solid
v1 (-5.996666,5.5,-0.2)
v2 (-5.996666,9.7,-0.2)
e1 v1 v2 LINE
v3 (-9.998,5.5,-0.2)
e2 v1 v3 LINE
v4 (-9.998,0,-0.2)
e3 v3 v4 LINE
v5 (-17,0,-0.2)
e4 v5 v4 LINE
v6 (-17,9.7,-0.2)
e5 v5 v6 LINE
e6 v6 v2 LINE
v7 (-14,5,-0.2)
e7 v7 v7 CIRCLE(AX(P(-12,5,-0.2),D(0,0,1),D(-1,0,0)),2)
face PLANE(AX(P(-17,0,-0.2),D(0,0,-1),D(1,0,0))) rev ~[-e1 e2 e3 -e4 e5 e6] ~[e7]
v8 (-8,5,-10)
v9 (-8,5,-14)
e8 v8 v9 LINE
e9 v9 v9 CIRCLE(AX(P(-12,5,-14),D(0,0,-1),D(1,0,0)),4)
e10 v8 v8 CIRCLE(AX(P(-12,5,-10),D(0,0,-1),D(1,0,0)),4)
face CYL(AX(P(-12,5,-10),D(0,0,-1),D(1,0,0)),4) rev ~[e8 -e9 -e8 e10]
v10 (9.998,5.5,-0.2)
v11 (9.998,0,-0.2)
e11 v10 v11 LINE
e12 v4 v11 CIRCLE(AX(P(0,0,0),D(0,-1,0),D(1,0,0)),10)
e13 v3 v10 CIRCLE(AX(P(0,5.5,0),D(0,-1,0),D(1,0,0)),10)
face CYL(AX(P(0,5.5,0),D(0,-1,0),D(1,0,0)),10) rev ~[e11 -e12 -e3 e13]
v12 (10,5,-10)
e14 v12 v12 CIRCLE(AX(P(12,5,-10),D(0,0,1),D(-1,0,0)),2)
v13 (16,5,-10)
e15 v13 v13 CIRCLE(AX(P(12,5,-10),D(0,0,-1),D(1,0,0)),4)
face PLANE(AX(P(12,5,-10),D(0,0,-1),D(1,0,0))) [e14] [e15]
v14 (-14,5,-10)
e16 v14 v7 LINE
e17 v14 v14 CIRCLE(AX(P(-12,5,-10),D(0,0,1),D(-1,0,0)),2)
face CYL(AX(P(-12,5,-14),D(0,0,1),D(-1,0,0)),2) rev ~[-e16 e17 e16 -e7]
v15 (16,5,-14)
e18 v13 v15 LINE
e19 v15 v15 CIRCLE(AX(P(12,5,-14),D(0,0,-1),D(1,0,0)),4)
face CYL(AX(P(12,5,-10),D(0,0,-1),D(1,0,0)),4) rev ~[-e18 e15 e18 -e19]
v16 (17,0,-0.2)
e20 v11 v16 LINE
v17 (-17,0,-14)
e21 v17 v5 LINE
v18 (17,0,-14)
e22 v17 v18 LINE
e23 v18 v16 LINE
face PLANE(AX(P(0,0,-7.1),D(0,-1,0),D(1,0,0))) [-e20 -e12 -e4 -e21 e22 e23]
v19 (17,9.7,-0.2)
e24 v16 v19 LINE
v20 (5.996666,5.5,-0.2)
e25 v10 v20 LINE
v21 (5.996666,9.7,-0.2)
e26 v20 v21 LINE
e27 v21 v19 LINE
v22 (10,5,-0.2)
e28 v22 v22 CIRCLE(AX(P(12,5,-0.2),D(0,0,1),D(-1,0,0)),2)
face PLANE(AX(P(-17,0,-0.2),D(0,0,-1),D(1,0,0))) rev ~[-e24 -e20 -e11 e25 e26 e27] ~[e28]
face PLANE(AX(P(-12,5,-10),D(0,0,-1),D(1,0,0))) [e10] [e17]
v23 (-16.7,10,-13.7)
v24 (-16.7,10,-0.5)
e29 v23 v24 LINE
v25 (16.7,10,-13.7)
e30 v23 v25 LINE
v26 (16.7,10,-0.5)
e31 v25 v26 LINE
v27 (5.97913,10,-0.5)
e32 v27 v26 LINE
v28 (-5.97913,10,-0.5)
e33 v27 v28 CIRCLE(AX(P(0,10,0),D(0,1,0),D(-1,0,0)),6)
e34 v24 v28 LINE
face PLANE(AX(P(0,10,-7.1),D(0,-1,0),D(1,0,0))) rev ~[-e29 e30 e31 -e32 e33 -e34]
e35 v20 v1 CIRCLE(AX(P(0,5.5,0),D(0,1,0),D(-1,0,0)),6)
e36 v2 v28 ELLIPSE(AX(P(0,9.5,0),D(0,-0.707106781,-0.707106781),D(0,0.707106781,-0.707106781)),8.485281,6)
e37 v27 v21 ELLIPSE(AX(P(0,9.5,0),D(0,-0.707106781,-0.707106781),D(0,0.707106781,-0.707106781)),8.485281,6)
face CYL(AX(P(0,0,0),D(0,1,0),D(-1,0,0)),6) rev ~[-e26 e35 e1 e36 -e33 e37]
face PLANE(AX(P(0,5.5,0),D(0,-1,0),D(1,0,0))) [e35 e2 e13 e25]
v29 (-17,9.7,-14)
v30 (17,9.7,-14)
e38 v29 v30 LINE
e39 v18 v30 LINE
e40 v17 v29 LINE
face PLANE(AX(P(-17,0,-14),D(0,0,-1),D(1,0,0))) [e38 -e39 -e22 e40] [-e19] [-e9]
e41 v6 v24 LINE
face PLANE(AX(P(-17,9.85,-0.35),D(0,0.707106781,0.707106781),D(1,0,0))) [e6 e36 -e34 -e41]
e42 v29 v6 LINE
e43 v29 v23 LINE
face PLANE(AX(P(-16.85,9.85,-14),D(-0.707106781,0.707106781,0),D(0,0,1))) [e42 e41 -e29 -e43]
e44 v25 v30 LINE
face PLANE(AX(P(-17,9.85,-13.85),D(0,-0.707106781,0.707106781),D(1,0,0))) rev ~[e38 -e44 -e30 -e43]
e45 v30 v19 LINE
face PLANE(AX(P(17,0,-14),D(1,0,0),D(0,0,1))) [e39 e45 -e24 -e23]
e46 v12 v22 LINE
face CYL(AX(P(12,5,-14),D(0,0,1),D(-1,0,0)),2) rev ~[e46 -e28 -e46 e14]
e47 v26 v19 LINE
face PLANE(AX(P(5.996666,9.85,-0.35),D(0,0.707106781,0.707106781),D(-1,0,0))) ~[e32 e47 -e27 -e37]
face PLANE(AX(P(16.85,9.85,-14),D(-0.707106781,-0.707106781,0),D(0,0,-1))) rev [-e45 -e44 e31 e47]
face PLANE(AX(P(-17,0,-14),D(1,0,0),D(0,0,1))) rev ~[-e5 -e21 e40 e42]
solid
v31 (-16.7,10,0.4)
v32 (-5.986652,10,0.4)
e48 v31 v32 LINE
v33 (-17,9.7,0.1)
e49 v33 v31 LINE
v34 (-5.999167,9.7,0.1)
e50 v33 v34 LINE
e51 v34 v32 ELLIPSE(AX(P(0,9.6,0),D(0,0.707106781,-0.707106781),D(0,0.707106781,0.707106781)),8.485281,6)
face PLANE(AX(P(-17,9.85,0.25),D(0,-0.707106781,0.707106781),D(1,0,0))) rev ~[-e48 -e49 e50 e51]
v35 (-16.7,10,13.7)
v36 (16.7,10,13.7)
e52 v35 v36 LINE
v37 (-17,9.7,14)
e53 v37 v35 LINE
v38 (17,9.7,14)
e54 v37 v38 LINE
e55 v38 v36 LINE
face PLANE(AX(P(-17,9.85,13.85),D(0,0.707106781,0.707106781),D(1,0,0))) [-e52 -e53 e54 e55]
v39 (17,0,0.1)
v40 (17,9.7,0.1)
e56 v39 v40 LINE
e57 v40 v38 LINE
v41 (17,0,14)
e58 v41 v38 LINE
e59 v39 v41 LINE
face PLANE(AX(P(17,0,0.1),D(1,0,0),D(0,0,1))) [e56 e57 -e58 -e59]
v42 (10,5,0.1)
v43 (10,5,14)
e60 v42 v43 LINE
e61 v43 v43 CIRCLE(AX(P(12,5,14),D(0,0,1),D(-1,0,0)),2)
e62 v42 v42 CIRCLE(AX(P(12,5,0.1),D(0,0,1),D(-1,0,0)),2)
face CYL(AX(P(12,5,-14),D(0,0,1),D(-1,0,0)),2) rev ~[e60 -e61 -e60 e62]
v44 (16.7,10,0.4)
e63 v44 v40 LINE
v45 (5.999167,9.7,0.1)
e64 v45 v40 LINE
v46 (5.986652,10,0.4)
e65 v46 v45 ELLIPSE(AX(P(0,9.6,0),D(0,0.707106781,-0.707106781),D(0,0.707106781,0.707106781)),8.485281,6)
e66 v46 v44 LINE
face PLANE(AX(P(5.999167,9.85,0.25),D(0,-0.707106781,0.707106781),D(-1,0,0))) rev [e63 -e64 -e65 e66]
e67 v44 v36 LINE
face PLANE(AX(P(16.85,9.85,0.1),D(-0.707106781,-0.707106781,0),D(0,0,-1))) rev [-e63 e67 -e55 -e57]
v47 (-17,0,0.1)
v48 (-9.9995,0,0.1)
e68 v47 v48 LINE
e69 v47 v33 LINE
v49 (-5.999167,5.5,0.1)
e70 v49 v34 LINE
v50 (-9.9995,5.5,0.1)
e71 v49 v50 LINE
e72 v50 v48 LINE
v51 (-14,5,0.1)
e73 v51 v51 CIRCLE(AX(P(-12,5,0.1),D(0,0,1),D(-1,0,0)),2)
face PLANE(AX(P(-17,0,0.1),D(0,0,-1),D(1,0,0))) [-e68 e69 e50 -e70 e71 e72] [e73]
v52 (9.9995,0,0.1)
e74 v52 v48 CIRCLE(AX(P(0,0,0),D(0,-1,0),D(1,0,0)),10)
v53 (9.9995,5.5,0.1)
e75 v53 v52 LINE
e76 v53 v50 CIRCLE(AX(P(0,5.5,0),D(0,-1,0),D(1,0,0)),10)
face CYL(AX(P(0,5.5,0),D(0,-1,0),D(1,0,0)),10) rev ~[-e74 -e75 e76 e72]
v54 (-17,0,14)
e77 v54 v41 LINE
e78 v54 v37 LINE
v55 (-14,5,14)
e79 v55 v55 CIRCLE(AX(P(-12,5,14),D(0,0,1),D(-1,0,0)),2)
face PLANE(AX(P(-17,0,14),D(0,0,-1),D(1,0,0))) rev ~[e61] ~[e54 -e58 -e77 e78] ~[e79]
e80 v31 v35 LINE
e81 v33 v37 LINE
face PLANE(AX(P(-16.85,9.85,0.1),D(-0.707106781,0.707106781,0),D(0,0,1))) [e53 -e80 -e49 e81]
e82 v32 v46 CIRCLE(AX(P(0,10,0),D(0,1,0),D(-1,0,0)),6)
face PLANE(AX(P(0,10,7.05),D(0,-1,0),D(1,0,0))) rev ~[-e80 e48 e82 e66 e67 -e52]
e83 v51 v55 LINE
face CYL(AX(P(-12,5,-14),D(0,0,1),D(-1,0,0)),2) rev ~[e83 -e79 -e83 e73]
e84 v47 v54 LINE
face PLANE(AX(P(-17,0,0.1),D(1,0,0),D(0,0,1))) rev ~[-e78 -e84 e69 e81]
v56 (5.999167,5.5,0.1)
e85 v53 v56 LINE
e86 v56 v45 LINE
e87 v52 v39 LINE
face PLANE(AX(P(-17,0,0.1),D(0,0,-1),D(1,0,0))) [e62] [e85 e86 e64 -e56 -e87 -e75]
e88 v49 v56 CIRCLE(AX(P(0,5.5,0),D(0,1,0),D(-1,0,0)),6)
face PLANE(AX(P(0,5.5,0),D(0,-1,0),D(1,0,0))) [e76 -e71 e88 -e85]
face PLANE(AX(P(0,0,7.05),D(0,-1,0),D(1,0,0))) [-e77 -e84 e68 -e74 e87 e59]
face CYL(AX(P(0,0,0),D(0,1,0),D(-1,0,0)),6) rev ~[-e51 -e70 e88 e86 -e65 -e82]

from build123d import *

# Parameters (mm, degrees)
F0_W             = 34
F0_H             = 13.9
F1_DEPTH         = 10
F0_H_2           = 13.8
F2_D             = 12
F2_CBORE_D       = 20
F2_CBORE_DEPTH   = 5.5
F2_2_D           = 12
F2_2_CBORE_D     = 20
F2_2_CBORE_DEPTH = 5.5
F4_D             = 4
F4_CBORE_D       = 8
F4_CBORE_DEPTH   = 4
F4_2_D           = 4
F4_2_CBORE_D     = 8
F4_2_CBORE_DEPTH = 4
F5_SIZE          = 0.3
F5_2_SIZE        = 0.3


# Not quite as in the source:
# - a feature names something its author has since deleted; it is built from what else it names


with BuildPart() as f1:
    # F0 (on Front) → F1 (new body)
    with BuildSketch(Plane.XZ):
        with Locations((0, 7.05)):
            Rectangle(F0_W, F0_H)
    extrude(amount=-F1_DEPTH)

    # F2 (through all)
    with Locations(Plane.XZ):
        with Locations((0, 0)):
            CounterBoreHole(F2_D / 2, F2_CBORE_D / 2, F2_CBORE_DEPTH)

    # F4 (through all)
    with Locations(Plane(origin=(0, 0, -14), x_dir=(1, 0, 0), z_dir=(0, 0, -1))):
        with Locations((-12, -5), (12, -5)):
            CounterBoreHole(F4_D / 2, F4_CBORE_D / 2, F4_CBORE_DEPTH)

    # F5
    f5_edges = [f1.edges().sort_by_distance(p)[0] for p in [
        (0, 10, 14),
        (-17, 10, 7.05),
        (17, 10, 7.05),
        (11.499583, 10, 0.1),
        (-11.499583, 10, 0.1),
    ]]
    chamfer(f5_edges, length=F5_SIZE)


with BuildPart() as f1b:
    # F0 (on Front) → F1, piece 2 (new body)
    with BuildSketch(Plane.XZ):
        with Locations((0, -7.1)):
            Rectangle(F0_W, F0_H_2)
    extrude(amount=-F1_DEPTH)

    # F2#2 (through all)
    with Locations(Plane.XZ):
        with Locations((0, 0)):
            CounterBoreHole(F2_2_D / 2, F2_2_CBORE_D / 2, F2_2_CBORE_DEPTH)

    # F4#2 (through all)
    with Locations(Plane(origin=(0, 0, -14), x_dir=(1, 0, 0), z_dir=(0, 0, -1))):
        with Locations((-12, -5), (12, -5)):
            CounterBoreHole(F4_2_D / 2, F4_2_CBORE_D / 2, F4_2_CBORE_DEPTH)

    # F5#2
    f5_2_edges = [f1b.edges().sort_by_distance(p)[0] for p in [
        (-17, 10, -7.1),
        (17, 10, -7.1),
        (0, 10, -14),
        (11.498333, 10, -0.2),
        (-11.498333, 10, -0.2),
    ]]
    chamfer(f5_2_edges, length=F5_2_SIZE)


solid = Compound([f1.part, f1b.part])
